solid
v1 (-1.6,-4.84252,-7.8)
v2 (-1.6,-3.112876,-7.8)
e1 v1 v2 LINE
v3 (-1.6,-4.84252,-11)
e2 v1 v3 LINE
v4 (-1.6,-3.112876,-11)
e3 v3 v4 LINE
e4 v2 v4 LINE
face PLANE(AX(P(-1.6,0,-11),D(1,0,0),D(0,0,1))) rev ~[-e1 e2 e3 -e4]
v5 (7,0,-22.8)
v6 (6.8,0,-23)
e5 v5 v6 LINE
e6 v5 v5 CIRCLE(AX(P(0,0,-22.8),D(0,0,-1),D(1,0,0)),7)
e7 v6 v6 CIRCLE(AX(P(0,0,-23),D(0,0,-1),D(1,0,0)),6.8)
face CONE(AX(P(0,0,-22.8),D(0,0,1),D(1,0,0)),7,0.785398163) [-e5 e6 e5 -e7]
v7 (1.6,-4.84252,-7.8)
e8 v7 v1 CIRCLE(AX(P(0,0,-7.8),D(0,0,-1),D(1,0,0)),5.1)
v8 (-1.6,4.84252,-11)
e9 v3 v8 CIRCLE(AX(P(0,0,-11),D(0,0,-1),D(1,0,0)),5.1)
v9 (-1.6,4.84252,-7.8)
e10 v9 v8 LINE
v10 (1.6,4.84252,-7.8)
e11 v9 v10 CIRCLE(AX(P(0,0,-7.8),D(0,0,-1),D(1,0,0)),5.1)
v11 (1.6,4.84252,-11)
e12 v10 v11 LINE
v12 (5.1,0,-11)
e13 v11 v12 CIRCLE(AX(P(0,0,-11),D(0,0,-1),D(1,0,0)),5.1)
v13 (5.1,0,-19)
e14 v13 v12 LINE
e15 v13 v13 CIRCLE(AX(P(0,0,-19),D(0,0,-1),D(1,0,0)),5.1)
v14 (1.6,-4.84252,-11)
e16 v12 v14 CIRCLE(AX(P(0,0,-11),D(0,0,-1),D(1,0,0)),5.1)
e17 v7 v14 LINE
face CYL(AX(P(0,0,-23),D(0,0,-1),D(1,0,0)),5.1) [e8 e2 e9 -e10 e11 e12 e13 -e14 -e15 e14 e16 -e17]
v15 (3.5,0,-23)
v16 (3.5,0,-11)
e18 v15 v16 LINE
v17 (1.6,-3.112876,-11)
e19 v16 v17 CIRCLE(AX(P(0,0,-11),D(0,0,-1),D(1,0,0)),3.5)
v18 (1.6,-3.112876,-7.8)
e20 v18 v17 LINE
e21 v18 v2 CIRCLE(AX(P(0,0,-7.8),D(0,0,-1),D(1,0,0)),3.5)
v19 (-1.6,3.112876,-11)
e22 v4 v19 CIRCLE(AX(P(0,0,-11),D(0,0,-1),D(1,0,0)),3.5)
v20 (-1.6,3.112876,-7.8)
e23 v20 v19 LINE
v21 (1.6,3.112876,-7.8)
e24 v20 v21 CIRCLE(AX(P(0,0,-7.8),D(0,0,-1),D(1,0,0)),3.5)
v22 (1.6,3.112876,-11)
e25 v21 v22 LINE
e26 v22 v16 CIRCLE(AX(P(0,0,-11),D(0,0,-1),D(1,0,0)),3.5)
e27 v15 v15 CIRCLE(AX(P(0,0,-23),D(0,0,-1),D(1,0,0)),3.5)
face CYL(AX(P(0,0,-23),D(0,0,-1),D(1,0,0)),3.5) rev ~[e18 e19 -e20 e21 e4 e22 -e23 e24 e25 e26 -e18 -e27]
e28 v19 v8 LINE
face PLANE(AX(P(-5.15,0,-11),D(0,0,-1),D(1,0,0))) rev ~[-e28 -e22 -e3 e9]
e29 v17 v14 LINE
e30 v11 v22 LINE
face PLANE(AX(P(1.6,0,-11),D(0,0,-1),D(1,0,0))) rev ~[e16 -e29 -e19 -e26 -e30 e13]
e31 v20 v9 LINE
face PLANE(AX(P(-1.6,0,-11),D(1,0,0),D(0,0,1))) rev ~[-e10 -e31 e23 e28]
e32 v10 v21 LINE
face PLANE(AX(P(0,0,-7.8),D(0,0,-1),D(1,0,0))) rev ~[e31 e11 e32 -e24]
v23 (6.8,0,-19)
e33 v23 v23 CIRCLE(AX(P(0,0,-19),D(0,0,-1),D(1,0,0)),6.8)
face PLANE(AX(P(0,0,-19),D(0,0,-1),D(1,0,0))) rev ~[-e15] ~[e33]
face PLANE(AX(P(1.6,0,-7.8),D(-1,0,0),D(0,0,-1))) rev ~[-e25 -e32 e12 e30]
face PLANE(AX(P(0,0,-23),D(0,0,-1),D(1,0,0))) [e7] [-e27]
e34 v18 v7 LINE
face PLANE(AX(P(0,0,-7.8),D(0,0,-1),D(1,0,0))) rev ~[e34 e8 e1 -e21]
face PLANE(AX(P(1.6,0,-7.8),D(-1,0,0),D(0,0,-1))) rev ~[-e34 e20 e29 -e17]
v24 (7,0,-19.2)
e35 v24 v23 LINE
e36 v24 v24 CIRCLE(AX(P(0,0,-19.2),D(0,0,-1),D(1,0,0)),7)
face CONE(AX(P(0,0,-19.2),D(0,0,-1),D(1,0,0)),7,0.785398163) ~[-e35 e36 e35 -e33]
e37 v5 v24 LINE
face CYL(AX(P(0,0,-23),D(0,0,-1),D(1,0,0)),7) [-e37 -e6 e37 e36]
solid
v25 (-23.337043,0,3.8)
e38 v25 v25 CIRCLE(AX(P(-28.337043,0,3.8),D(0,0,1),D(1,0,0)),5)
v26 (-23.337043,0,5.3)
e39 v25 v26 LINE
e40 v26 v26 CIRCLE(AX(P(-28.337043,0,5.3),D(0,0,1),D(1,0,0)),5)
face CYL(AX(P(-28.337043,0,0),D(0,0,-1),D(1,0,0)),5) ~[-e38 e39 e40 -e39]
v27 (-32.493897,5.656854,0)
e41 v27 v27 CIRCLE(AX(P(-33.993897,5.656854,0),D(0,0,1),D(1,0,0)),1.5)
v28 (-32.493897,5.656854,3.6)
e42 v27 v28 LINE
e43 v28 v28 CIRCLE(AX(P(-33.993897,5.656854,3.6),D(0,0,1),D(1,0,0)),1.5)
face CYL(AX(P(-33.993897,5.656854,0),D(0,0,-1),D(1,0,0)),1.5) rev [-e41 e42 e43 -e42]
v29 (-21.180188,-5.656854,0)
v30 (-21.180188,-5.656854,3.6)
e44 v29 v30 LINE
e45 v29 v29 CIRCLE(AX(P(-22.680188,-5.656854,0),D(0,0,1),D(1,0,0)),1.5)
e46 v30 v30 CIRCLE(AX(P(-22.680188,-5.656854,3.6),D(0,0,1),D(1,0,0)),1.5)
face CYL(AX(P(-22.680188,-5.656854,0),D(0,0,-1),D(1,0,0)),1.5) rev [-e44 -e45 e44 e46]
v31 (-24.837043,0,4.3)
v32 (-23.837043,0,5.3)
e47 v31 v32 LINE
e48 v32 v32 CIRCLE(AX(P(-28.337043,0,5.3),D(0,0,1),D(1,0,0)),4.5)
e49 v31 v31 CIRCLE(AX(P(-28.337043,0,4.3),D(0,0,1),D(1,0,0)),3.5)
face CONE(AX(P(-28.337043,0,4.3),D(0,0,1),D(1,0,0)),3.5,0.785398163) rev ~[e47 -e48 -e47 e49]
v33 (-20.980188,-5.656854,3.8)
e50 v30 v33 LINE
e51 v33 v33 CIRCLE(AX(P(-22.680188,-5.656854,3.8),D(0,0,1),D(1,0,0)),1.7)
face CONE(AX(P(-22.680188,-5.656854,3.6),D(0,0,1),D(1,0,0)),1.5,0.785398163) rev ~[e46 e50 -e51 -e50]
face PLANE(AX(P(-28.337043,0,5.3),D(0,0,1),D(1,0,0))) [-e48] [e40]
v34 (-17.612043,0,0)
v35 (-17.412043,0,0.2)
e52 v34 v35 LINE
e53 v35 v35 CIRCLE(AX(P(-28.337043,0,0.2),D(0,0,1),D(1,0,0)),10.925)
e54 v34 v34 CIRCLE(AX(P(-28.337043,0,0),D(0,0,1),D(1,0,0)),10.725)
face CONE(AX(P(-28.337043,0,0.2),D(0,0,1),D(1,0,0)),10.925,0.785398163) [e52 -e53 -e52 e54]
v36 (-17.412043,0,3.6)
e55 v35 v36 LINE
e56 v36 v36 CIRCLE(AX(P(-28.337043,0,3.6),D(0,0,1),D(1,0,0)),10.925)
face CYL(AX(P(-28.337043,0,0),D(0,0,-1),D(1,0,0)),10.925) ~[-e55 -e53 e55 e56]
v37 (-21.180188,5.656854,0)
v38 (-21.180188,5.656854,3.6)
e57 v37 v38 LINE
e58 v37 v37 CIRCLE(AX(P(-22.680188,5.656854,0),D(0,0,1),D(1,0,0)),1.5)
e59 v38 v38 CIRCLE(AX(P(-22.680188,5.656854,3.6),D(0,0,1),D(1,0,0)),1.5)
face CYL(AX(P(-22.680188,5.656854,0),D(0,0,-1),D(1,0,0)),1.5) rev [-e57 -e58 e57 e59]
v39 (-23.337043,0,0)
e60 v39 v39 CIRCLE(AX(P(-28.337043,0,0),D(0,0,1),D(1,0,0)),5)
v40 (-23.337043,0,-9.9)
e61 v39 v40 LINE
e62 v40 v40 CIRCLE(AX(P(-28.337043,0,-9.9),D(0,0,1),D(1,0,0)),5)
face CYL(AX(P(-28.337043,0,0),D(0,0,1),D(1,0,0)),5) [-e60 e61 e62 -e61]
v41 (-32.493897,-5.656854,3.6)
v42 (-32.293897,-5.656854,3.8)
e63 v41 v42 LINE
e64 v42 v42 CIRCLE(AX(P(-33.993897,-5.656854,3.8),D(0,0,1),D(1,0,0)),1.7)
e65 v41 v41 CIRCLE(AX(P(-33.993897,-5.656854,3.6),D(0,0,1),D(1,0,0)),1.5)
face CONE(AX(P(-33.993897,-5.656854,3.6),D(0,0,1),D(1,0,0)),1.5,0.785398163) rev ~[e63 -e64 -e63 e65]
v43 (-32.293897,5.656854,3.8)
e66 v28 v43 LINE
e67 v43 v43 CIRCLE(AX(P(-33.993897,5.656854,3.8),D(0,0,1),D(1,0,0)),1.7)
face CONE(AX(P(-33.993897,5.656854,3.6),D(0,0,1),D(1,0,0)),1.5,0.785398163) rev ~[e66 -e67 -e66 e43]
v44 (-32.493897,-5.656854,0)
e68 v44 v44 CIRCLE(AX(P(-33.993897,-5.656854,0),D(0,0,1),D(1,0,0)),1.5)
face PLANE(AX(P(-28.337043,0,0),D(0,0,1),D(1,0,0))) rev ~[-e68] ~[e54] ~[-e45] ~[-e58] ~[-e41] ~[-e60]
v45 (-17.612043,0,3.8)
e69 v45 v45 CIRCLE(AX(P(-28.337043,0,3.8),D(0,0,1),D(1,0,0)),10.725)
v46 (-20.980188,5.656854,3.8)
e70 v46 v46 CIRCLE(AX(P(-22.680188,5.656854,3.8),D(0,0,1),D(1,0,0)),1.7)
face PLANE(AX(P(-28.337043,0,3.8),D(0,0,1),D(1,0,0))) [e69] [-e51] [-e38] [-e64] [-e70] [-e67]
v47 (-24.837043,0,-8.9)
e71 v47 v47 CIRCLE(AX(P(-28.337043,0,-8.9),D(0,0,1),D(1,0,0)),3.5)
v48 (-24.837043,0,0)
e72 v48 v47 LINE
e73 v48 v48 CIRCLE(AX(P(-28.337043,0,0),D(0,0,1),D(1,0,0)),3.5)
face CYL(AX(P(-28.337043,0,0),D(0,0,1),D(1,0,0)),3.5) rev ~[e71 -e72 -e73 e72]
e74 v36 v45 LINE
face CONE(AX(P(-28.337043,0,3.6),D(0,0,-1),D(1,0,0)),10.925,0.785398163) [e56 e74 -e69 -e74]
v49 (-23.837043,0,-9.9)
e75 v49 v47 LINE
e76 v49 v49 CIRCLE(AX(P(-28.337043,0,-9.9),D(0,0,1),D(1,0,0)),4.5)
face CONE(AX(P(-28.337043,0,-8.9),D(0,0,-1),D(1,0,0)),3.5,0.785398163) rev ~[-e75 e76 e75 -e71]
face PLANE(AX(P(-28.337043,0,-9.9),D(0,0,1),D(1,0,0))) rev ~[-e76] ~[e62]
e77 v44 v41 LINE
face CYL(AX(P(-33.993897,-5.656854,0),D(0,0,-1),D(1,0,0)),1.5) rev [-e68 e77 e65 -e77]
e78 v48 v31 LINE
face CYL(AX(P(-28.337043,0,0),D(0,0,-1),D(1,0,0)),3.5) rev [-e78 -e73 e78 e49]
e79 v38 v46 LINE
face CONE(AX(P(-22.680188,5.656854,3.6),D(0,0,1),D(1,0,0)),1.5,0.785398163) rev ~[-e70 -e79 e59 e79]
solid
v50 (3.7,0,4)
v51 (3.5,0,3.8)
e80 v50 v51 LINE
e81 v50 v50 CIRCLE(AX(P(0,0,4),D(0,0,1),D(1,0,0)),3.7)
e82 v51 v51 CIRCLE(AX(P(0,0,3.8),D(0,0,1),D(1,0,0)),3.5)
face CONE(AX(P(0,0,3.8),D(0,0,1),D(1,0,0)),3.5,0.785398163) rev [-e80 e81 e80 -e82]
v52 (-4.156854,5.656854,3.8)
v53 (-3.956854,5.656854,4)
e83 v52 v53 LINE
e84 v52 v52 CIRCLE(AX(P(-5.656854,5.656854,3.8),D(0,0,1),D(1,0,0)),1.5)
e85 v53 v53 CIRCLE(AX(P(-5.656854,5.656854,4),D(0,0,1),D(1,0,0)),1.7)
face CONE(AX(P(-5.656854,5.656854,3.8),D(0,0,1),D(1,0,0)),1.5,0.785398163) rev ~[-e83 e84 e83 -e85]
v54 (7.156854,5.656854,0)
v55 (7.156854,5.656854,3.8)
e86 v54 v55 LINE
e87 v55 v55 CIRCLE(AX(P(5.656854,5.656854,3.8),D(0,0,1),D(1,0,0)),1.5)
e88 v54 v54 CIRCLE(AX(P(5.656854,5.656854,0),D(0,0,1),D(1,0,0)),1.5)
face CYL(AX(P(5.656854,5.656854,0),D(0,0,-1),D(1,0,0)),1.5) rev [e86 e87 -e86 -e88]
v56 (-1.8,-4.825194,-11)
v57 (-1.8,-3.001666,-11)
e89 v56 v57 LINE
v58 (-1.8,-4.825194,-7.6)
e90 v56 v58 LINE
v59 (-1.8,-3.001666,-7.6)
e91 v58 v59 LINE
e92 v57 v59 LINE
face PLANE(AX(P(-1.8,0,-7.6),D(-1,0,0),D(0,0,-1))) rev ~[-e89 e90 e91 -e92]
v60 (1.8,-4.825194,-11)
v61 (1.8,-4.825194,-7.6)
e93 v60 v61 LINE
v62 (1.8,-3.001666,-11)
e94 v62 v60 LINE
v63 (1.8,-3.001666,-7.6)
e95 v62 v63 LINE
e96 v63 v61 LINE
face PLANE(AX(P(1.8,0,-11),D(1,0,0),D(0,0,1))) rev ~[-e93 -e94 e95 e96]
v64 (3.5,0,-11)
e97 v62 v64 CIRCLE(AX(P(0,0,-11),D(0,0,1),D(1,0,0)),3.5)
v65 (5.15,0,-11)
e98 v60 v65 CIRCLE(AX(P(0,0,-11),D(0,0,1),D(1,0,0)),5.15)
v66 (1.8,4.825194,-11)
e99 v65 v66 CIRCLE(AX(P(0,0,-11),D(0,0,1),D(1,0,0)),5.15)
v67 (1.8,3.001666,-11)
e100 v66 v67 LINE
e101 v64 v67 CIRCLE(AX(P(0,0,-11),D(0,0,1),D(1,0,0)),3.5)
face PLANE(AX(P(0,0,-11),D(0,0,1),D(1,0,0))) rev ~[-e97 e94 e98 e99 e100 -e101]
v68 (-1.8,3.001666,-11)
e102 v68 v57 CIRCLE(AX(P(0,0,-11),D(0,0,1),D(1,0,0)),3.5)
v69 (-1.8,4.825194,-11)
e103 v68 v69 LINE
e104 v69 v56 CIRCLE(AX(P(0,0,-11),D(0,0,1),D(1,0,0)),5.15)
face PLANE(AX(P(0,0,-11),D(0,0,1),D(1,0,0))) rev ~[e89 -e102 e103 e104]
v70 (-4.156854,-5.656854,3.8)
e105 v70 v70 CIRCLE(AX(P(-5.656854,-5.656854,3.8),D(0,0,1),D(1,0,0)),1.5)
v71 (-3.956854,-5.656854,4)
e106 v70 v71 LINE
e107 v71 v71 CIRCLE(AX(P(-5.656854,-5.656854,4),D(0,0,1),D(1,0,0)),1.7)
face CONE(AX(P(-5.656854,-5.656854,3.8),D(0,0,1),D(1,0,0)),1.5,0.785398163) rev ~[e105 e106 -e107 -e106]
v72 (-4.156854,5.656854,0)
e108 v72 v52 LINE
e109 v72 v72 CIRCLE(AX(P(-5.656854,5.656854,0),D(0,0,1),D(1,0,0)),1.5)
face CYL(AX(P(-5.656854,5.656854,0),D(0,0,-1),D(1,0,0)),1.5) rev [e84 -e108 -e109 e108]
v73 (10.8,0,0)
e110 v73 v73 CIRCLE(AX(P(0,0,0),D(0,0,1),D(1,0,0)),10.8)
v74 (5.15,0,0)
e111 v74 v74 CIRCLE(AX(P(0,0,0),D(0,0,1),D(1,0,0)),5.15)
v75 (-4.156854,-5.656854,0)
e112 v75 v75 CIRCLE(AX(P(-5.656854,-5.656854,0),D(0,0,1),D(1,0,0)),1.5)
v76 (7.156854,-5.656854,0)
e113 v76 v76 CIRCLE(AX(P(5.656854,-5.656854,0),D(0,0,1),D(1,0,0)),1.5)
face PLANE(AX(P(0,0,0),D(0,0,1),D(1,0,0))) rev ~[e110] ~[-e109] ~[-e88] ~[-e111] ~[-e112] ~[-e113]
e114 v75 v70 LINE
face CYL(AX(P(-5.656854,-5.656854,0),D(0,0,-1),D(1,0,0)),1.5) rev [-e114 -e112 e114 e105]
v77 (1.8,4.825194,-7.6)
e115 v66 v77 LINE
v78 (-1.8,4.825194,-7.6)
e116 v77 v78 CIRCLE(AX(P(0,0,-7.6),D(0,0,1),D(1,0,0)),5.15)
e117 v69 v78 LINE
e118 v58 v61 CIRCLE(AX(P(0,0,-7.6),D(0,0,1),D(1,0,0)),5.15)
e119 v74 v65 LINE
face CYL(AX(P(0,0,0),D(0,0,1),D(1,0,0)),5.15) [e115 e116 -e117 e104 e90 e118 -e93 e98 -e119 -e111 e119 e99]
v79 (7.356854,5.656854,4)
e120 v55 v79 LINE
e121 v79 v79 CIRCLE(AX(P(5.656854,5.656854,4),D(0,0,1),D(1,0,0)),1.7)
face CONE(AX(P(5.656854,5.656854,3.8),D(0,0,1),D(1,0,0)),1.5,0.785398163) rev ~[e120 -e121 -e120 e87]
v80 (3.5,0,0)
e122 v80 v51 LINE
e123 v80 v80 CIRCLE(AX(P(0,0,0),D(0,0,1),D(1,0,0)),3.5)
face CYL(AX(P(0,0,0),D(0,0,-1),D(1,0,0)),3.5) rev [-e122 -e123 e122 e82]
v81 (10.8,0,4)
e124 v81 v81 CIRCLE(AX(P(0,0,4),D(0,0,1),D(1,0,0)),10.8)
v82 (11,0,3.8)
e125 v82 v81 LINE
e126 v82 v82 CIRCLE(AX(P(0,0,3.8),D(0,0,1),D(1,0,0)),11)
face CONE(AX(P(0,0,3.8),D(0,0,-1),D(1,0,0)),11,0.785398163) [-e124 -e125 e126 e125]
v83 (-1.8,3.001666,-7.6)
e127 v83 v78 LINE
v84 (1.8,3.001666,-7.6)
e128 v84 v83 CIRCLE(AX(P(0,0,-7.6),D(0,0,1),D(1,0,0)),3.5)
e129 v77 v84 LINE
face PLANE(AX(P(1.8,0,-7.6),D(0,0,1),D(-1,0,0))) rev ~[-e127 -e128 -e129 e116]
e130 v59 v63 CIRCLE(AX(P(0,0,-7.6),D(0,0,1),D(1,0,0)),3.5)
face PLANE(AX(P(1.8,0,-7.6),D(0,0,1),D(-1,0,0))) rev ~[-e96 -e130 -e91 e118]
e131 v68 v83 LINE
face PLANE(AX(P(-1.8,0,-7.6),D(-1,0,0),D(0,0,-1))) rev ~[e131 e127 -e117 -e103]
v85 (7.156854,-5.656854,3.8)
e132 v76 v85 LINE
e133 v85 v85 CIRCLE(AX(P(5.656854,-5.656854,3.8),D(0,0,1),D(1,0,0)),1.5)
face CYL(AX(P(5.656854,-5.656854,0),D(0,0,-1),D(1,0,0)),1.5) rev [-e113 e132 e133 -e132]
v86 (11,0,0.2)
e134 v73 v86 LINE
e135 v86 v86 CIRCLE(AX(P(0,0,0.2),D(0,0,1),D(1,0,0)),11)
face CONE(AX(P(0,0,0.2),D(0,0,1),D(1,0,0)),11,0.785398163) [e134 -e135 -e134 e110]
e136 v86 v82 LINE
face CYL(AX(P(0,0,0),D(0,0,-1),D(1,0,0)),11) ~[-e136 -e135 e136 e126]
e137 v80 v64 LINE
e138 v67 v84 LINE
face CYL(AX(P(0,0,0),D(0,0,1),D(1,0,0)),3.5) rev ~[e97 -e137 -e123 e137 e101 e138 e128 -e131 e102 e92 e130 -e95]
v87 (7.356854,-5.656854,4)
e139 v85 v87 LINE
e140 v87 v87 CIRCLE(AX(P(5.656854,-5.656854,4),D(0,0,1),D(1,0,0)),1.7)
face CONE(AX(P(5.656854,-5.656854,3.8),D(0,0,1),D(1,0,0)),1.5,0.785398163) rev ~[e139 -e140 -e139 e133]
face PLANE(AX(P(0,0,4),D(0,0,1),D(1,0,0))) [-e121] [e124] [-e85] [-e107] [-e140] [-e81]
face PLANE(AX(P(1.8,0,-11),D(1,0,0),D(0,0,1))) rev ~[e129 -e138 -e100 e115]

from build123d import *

# Parameters (mm, degrees)
F0_R       = 10.925
F0_R_2     = 1.5
F0_R_3     = 5
F1_DEPTH   = 3.8
F0_R_4     = 3.5
F2_DEPTH   = 5.3
F3_DEPTH   = 9.9
F4_SIZE    = 1
F5_SIZE    = 0.2
F0_R_5     = 11
F0_R_6     = 5.15
F6_DEPTH   = 4
F7_DEPTH   = 11
F9_R       = 5.1
F9_R_2     = 3.5
F10_DEPTH  = 15.2
F9_R_3     = 7
F11_DEPTH  = 4
F12_W      = 3.2
F12_H      = 3
F12_H_2    = 0.2
F12_W_2    = 0.2
F13_DEPTH  = 12.5
F12_W_3    = 3.35
F12_H_3    = 3.2
F14_DEPTH  = 12.5
F15_SIZE   = 0.2
F15_2_SIZE = 0.2


with BuildPart() as f1:
    # F0 (on Top) → F1 (new body)
    with BuildSketch(Plane.XY):
        with Locations((-28.3370425482, 7.17e-08)):
            Circle(F0_R)
        with Locations((-33.9938967977, -5.6568541778)):
            Circle(F0_R_2, mode=Mode.SUBTRACT)
        with Locations((-22.6801882987, -5.6568541778)):
            Circle(F0_R_2, mode=Mode.SUBTRACT)
        with Locations((-28.3370425482, 7.17e-08)):
            Circle(F0_R_3, mode=Mode.SUBTRACT)
        with Locations((-33.9938967977, 5.6568543212)):
            Circle(F0_R_2, mode=Mode.SUBTRACT)
        with Locations((-22.6801882987, 5.6568543212)):
            Circle(F0_R_2, mode=Mode.SUBTRACT)
    extrude(amount=F1_DEPTH)

    # F0 (on Top) → F2 (join)
    with BuildSketch(Plane.XY):
        with Locations((-28.3370425482, 7.17e-08)):
            Circle(F0_R_3)
        with Locations((-28.3370425482, 7.17e-08)):
            Circle(F0_R_4, mode=Mode.SUBTRACT)
    extrude(amount=F2_DEPTH)

    # F0 (on Top) → F3 (join)
    with BuildSketch(Plane.XY):
        with Locations((-28.3370425482, 7.17e-08)):
            Circle(F0_R_3)
        with Locations((-28.3370425482, 7.17e-08)):
            Circle(F0_R_4, mode=Mode.SUBTRACT)
    extrude(amount=-F3_DEPTH)

    # F4
    f4_edges = [f1.edges().sort_by_distance(p)[0] for p in [
        (-31.837043, 0, 5.3),
        (-31.837043, 0, -9.9),
    ]]
    chamfer(f4_edges, length=F4_SIZE)

    # F5
    f5_edges = [f1.edges().sort_by_distance(p)[0] for p in [
        (-35.493897, 5.656854, 3.8),
        (-35.493897, -5.656854, 3.8),
        (-24.180188, -5.656854, 3.8),
        (-24.180188, 5.656854, 3.8),
        (-39.262043, 0, 3.8),
        (-39.262043, 0, 0),
    ]]
    chamfer(f5_edges, length=F5_SIZE)


with BuildPart() as f6:
    # F0 (on Top) → F6 (new body)
    with BuildSketch(Plane.XY):
        Circle(F0_R_5)
        with Locations((-5.6568542495, -5.6568542495)):
            Circle(F0_R_2, mode=Mode.SUBTRACT)
        with Locations((5.6568542495, -5.6568542495)):
            Circle(F0_R_2, mode=Mode.SUBTRACT)
        Circle(F0_R_6, mode=Mode.SUBTRACT)
        with Locations((-5.6568542495, 5.6568542495)):
            Circle(F0_R_2, mode=Mode.SUBTRACT)
        with Locations((5.6568542495, 5.6568542495)):
            Circle(F0_R_2, mode=Mode.SUBTRACT)
        Circle(F0_R_6)
        Circle(F0_R_4, mode=Mode.SUBTRACT)
    extrude(amount=F6_DEPTH)

    # F0 (on Top) → F7 (join)
    with BuildSketch(Plane.XY):
        Circle(F0_R_6)
        Circle(F0_R_4, mode=Mode.SUBTRACT)
    extrude(amount=-F7_DEPTH)

    # F12 (on Front) → F13 (cut, symmetric)
    with BuildSketch(Plane.XZ):
        with Locations((0, -9.3)):
            Rectangle(F12_W, F12_H)
        with Locations((0, -10.9)):
            Rectangle(F12_W, F12_H_2)
        with Locations((-1.7, -10.9)):
            Rectangle(F12_W_2, F12_H_2)
        Polygon((-1.8, -7.6), (-1.8, -10.8), (-1.6, -10.8), (-1.6, -7.8), (1.6, -7.8), (1.6, -10.8), (1.8, -10.8), (1.8, -7.6), align=None)
        with Locations((1.7, -10.9)):
            Rectangle(F12_W_2, F12_H_2)
    extrude(amount=F13_DEPTH, both=True, mode=Mode.SUBTRACT)

    # F15
    f15_edges = [f6.edges().sort_by_distance(p)[0] for p in [
        (-3.5, 0, 4),
        (-11, 0, 4),
        (-7.156854, -5.656854, 4),
        (4.156854, -5.656854, 4),
        (4.156854, 5.656854, 4),
        (-7.156854, 5.656854, 4),
        (-11, 0, 0),
    ]]
    chamfer(f15_edges, length=F15_SIZE)


with BuildPart() as f10:
    # F9 (on offset) → F10 (new body)
    with BuildSketch(Plane(origin=(0, 0, -23), x_dir=(1, 0, 0), z_dir=(0, 0, -1))):
        Circle(F9_R)
        Circle(F9_R_2, mode=Mode.SUBTRACT)
    extrude(amount=-F10_DEPTH)

    # F9 (on offset) → F11 (join)
    with BuildSketch(Plane(origin=(0, 0, -23), x_dir=(1, 0, 0), z_dir=(0, 0, -1))):
        Circle(F9_R_3)
        Circle(F9_R, mode=Mode.SUBTRACT)
    extrude(amount=-F11_DEPTH)

    # F12 (on Front) → F14 (cut, symmetric)
    with BuildSketch(Plane.XZ):
        Polygon((-1.8, -7.6), (-1.8, -10.8), (-1.6, -10.8), (-1.6, -7.8), (1.6, -7.8), (1.6, -10.8), (1.8, -10.8), (1.8, -7.6), align=None)
        with Locations((-3.475, -9.2)):
            Rectangle(F12_W_3, F12_H_3)
        with Locations((3.475, -9.2)):
            Rectangle(F12_W_3, F12_H_3)
        with Locations((-3.475, -10.9)):
            Rectangle(F12_W_3, F12_H_2)
        with Locations((-1.7, -10.9)):
            Rectangle(F12_W_2, F12_H_2)
        with Locations((1.7, -10.9)):
            Rectangle(F12_W_2, F12_H_2)
        with Locations((3.475, -10.9)):
            Rectangle(F12_W_3, F12_H_2)
    extrude(amount=F14_DEPTH, both=True, mode=Mode.SUBTRACT)

    # F15#2
    f15_2_edges = [f10.edges().sort_by_distance(p)[0] for p in [
        (-7, 0, -19),
        (-7, 0, -23),
    ]]
    chamfer(f15_2_edges, length=F15_2_SIZE)


solid = Compound([f1.part, f6.part, f10.part])
